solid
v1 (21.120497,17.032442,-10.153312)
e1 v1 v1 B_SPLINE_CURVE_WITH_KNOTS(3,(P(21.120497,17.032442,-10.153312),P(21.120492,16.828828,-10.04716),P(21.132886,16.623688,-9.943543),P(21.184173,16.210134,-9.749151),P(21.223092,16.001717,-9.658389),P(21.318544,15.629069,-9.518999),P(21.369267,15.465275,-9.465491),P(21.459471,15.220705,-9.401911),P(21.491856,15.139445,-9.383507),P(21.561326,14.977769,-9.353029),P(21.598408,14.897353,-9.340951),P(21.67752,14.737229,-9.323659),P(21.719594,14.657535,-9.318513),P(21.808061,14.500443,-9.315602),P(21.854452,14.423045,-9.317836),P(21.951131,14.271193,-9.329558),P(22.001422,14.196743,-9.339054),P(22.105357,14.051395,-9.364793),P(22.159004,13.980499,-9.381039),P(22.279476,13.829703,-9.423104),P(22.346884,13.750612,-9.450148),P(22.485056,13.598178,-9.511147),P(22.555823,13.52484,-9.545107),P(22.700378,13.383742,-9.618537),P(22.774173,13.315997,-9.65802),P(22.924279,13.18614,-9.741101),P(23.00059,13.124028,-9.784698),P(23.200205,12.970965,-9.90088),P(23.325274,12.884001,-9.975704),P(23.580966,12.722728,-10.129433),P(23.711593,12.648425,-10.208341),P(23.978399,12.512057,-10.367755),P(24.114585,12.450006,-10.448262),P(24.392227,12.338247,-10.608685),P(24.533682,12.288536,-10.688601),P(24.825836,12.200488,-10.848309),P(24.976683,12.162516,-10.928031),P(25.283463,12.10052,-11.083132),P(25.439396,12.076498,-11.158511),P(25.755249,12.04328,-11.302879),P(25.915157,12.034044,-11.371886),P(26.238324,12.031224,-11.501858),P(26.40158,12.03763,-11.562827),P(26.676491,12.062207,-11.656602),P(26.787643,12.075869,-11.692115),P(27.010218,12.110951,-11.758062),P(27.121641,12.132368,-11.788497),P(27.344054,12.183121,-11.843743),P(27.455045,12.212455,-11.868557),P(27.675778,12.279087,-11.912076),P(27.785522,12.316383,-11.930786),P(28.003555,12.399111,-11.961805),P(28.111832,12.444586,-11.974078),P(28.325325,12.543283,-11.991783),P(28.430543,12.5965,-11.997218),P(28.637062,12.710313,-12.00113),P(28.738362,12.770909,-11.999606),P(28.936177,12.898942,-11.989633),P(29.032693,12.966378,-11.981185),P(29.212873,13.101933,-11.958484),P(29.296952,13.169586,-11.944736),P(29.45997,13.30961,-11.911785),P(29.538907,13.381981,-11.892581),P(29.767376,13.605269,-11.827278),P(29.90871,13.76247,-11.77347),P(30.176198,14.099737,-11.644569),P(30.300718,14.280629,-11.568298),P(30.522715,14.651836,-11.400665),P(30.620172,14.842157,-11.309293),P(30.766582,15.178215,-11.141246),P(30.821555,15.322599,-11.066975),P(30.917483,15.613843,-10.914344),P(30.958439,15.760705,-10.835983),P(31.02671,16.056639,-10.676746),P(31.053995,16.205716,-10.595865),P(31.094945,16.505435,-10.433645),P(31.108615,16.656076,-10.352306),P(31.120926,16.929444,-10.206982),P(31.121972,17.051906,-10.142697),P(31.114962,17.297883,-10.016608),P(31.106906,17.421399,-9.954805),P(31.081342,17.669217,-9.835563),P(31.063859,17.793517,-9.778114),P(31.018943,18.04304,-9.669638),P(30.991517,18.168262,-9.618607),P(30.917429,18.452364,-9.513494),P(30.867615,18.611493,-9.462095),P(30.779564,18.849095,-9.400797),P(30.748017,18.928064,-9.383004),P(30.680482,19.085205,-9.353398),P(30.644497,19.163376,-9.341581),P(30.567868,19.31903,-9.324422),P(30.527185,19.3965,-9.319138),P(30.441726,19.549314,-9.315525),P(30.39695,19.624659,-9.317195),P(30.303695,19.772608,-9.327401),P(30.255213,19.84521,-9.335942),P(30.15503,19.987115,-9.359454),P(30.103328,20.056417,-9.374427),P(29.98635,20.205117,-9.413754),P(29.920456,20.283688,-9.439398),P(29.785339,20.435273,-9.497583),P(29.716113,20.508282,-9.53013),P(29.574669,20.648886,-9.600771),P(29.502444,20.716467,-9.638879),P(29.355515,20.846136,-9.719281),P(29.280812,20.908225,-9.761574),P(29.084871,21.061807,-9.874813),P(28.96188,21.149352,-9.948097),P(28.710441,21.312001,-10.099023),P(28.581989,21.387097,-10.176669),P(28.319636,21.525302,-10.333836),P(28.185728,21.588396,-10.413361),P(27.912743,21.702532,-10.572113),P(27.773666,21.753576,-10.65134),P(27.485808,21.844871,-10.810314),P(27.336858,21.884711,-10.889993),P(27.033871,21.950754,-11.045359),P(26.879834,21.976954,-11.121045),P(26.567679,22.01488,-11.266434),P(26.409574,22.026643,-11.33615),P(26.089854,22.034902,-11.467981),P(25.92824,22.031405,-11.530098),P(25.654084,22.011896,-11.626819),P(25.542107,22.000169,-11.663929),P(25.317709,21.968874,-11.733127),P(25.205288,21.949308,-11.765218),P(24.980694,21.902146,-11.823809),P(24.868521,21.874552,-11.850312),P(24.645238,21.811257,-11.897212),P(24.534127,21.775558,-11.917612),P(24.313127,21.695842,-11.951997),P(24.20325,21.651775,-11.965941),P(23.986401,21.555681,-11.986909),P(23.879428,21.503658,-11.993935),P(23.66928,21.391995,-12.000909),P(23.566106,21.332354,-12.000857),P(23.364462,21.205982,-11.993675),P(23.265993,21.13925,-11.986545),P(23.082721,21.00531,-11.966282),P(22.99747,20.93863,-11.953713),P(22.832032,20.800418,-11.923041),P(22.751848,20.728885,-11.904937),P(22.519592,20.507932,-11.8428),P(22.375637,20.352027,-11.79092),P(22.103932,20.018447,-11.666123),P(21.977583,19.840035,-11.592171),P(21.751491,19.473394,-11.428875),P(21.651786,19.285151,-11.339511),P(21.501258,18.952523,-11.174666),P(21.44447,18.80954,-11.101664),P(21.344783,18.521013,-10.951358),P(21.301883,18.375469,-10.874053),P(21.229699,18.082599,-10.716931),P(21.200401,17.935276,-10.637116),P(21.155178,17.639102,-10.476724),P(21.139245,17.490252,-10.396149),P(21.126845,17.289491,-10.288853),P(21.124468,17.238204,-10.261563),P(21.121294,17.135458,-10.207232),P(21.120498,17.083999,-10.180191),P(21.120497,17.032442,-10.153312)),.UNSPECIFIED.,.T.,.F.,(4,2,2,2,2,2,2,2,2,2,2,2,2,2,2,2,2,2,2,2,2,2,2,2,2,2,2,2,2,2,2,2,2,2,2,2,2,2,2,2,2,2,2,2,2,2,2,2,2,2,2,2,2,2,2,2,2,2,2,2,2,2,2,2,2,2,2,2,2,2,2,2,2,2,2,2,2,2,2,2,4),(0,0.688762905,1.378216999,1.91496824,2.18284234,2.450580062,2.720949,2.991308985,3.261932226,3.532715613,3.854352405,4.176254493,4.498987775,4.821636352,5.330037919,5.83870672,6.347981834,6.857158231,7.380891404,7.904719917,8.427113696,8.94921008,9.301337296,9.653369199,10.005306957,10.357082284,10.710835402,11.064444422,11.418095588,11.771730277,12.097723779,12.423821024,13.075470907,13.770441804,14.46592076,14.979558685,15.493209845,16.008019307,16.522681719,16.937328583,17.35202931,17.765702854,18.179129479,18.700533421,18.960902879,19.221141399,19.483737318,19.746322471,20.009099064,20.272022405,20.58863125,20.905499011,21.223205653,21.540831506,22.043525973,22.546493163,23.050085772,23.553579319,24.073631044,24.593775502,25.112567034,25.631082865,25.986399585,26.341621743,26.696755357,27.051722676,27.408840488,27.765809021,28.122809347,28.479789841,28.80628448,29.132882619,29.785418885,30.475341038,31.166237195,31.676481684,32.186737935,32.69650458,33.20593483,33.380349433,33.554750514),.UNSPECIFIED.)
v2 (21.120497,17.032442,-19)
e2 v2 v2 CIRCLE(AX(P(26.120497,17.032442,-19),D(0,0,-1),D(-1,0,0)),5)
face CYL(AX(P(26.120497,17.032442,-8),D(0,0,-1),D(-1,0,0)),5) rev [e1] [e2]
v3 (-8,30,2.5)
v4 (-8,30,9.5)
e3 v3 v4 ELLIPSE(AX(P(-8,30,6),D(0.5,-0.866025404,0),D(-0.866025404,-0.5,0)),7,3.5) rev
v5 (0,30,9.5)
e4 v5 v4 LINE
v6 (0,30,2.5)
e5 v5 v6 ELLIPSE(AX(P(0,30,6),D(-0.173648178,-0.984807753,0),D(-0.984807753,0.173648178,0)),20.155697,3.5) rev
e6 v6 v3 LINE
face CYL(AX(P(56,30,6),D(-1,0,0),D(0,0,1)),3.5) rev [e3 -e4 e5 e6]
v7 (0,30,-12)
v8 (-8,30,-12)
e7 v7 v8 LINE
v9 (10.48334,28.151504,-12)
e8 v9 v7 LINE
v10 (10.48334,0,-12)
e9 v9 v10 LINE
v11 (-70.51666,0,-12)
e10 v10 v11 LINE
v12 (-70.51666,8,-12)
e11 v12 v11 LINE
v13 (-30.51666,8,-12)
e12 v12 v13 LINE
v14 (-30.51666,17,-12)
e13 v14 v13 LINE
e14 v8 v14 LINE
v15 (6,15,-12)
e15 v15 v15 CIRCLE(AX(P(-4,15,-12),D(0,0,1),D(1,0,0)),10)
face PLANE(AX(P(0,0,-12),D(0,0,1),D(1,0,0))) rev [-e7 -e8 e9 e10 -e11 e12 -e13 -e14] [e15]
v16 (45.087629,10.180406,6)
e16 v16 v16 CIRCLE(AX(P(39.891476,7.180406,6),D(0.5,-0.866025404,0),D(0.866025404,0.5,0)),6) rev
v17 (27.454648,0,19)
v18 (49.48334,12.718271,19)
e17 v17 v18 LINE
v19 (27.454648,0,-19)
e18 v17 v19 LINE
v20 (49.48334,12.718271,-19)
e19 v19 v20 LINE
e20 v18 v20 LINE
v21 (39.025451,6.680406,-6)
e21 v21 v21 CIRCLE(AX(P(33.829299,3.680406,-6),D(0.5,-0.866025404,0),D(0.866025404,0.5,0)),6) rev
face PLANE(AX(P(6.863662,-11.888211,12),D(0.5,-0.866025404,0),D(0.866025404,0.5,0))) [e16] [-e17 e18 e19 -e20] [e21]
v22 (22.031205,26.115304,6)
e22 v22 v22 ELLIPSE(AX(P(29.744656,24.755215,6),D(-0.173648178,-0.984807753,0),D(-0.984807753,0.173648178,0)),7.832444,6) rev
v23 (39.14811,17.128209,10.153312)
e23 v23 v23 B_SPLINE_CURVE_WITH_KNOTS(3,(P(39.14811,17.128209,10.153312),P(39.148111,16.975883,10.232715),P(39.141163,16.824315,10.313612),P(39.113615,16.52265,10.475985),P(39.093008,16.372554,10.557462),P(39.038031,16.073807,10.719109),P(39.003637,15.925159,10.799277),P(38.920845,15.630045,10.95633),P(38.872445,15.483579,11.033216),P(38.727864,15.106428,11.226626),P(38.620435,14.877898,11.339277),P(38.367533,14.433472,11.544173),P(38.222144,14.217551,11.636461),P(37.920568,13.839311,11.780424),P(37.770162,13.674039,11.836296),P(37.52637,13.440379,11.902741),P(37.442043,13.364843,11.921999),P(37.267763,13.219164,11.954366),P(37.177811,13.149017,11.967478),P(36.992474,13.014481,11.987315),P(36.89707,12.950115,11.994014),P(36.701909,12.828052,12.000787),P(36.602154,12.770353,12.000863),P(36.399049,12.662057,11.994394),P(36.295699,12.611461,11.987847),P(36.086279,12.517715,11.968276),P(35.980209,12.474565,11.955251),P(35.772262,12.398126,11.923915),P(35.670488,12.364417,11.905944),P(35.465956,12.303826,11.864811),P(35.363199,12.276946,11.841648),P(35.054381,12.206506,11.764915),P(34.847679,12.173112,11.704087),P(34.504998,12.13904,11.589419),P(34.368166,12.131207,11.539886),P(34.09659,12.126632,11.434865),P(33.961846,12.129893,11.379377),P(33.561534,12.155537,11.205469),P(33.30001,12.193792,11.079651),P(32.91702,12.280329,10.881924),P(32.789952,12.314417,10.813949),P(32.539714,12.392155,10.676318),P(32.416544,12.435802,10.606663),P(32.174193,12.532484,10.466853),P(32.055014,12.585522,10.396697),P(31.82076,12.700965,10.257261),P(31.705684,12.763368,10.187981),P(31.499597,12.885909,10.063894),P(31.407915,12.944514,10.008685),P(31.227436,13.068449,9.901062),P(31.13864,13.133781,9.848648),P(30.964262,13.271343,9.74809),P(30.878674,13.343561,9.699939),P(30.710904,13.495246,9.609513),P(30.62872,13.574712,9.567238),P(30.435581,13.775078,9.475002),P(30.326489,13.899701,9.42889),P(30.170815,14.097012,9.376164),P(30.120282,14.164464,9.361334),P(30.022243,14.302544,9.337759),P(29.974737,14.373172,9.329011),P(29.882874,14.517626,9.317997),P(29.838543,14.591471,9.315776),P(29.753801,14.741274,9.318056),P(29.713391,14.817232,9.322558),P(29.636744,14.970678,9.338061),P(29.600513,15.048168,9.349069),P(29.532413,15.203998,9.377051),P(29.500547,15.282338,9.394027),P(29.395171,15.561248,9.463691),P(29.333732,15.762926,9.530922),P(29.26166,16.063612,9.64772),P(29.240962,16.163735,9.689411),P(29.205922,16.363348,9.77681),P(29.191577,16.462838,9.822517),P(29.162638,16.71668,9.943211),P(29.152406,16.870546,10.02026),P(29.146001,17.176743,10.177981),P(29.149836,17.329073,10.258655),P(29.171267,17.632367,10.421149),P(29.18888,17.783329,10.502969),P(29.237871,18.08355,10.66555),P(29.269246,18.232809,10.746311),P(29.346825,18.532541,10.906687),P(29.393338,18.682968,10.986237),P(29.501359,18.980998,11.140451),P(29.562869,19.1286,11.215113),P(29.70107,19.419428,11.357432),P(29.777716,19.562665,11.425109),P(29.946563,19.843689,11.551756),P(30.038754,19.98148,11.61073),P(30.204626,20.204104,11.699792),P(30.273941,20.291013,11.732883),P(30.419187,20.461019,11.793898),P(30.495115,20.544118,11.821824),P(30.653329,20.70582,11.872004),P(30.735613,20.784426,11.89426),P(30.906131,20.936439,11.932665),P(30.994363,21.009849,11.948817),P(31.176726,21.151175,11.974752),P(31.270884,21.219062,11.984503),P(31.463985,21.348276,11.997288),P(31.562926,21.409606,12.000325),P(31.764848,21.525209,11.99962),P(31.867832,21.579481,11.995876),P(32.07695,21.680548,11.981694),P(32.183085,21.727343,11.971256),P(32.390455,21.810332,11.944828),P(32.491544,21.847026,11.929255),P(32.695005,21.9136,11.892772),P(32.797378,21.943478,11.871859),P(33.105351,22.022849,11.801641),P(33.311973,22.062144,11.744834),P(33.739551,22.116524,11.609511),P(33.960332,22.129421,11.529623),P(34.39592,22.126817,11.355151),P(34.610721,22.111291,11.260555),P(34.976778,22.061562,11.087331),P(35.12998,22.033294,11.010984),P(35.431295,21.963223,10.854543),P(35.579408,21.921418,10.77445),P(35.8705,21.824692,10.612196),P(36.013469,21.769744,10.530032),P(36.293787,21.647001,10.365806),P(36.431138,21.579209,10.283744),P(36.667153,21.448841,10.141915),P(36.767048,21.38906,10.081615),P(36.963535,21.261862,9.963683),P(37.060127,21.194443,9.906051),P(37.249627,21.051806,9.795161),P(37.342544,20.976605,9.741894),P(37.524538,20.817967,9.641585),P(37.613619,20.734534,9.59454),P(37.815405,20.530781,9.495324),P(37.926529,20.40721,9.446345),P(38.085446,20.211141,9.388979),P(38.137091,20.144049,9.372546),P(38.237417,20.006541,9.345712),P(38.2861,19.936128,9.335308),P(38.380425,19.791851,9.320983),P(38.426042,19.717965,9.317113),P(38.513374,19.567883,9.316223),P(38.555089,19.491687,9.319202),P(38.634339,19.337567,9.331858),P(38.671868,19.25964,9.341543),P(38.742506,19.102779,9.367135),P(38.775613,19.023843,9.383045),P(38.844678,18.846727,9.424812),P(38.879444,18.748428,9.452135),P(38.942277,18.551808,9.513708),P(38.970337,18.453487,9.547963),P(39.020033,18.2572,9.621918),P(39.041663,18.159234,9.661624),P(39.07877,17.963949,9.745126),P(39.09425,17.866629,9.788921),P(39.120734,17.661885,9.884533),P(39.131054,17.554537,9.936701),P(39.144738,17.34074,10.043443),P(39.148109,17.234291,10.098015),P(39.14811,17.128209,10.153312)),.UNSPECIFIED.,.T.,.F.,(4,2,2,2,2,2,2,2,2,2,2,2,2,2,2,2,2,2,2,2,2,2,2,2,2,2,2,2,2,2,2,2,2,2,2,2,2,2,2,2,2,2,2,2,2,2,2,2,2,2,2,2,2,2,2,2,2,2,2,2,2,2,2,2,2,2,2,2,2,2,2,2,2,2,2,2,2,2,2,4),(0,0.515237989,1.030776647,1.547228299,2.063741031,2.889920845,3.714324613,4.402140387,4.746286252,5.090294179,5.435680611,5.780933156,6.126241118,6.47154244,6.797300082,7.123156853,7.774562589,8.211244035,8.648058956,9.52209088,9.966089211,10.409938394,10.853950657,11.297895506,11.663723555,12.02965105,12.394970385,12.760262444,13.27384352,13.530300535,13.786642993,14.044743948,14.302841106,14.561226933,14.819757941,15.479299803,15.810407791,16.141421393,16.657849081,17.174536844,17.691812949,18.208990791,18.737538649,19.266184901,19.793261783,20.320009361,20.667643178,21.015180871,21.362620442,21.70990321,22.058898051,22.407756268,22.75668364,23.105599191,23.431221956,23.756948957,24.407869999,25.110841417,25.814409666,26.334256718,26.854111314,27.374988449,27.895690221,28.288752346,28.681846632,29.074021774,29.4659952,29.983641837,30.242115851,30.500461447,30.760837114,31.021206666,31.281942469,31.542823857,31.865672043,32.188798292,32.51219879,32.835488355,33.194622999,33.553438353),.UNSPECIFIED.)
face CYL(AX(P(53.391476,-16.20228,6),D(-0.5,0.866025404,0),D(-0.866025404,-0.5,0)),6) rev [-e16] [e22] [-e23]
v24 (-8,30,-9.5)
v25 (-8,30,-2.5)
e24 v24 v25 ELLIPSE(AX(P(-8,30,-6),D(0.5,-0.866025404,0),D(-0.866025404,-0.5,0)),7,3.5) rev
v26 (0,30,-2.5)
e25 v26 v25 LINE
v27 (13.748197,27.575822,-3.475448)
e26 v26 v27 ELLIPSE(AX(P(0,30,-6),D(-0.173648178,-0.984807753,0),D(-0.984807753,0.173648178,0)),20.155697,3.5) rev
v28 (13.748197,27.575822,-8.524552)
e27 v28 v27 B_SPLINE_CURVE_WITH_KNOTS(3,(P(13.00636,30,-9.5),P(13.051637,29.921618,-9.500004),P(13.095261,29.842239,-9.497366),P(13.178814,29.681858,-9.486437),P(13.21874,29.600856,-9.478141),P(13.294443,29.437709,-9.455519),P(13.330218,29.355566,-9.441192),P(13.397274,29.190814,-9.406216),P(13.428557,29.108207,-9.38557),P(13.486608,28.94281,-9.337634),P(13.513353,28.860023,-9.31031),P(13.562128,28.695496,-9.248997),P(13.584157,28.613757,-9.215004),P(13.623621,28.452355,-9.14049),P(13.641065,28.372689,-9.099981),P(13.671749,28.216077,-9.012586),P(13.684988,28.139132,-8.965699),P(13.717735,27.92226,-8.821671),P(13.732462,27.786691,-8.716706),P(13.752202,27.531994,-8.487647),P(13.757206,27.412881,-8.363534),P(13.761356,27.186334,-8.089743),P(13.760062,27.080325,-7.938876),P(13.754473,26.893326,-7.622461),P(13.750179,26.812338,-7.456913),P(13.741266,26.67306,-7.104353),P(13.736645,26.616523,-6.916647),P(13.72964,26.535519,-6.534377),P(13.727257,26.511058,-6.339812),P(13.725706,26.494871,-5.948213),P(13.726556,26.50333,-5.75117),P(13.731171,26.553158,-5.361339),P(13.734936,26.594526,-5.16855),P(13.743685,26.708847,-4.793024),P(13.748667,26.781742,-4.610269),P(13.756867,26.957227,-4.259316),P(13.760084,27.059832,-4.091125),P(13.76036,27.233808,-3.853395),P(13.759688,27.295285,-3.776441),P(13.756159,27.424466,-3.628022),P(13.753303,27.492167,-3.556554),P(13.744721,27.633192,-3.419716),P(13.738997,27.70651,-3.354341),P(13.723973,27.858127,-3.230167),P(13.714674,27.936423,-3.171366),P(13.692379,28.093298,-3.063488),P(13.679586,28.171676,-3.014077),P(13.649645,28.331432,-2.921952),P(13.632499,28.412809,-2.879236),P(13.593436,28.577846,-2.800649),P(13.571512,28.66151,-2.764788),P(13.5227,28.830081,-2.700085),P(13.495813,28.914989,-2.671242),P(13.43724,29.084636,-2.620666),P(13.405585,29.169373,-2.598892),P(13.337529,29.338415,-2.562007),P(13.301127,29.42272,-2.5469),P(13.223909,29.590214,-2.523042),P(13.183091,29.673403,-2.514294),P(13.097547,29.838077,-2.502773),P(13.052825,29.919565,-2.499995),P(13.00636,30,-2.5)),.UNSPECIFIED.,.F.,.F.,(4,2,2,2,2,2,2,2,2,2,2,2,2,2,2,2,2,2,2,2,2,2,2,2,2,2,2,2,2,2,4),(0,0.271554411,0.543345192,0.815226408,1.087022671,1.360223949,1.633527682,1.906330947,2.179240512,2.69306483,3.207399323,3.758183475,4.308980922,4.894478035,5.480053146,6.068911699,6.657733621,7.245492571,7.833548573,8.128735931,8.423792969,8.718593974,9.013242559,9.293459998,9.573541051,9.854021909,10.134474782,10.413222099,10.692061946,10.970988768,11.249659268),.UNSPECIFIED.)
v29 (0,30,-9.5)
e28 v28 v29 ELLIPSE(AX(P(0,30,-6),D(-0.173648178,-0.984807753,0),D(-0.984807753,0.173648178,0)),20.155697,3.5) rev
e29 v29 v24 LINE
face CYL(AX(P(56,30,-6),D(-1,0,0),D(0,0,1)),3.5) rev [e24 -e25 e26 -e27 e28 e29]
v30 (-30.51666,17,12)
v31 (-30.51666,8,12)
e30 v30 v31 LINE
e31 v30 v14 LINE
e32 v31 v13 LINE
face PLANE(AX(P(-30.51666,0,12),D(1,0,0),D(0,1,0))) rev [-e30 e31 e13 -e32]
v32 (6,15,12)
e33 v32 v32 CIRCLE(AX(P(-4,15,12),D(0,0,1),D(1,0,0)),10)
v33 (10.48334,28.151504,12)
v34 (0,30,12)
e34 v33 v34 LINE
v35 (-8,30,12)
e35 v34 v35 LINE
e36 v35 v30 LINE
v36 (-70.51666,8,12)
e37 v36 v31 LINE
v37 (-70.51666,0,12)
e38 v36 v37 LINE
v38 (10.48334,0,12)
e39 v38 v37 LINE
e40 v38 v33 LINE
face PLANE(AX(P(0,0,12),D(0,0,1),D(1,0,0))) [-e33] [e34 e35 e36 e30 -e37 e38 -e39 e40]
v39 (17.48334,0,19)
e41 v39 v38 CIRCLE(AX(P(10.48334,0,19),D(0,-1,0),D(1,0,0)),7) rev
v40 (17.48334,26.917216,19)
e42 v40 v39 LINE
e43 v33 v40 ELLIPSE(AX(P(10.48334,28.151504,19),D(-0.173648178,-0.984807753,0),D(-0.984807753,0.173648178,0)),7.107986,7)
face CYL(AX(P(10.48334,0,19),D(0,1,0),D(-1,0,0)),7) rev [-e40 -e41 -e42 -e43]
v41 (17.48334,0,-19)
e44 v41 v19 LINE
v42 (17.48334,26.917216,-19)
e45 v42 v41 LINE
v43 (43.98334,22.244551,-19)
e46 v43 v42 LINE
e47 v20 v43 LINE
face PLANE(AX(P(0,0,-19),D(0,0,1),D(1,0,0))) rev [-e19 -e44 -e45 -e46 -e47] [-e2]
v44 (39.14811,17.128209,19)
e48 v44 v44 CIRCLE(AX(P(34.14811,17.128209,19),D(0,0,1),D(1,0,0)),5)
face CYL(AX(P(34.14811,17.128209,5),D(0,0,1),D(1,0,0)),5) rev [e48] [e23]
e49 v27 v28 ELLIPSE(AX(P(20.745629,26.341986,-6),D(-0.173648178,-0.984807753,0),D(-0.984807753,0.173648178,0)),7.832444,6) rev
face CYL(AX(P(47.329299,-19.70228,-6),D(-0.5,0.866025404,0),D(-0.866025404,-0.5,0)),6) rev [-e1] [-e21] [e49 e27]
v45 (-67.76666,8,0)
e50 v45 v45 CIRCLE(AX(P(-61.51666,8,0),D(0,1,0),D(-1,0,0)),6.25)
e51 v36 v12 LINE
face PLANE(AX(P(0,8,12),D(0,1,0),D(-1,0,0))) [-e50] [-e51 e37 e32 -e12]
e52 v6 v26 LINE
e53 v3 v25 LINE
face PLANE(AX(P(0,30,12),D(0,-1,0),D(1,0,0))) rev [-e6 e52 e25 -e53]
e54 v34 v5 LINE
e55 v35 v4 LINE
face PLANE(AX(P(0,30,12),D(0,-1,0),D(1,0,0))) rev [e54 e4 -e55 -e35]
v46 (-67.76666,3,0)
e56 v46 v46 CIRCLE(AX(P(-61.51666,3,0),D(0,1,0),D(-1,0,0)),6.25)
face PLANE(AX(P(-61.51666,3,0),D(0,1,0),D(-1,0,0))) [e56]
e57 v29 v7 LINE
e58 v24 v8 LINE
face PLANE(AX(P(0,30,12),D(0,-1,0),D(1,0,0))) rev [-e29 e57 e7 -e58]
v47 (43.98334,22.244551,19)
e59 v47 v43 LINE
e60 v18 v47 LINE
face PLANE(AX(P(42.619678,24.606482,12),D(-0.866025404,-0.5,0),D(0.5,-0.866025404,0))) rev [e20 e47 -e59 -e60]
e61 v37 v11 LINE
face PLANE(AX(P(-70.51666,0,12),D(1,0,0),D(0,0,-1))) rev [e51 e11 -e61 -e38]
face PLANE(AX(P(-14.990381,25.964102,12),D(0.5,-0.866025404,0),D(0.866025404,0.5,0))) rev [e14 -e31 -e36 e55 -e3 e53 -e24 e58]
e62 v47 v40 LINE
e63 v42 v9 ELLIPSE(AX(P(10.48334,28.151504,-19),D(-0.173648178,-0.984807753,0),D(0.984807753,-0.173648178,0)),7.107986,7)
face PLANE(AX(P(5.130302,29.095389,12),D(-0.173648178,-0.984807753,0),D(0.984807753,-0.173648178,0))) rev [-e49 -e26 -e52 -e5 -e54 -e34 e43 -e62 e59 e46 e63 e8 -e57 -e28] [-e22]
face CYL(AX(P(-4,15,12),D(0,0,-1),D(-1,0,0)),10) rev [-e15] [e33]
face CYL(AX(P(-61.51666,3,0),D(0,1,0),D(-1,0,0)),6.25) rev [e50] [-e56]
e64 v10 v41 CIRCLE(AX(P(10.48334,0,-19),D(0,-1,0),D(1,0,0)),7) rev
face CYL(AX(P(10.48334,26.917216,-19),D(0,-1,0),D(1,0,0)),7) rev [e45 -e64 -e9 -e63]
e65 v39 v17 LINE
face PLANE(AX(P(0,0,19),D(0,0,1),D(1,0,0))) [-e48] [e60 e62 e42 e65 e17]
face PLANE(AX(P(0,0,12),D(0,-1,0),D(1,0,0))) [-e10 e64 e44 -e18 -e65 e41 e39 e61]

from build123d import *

# Parameters (mm, degrees)
SKETCH1_R               = 10
SKETCH1_W               = 40
SKETCH1_H               = 8
BOSS_EXTRUDE1_DEPTH     = 12
BOSS_EXTRUDE2_DEPTH     = 19
CUT_EXTRUDE1_DEPTH      = 38
CUT_EXTRUDE1_DEPTH_BACK = 38
SKETCH4_R               = 6
FILLET1_R               = 7
SKETCH6_R               = 6.25
CUT_EXTRUDE2_DEPTH      = 5
CUT_EXTRUDE3_DEPTH      = 56
CUT_EXTRUDE3_DEPTH_BACK = 21
SKETCH9_R               = 5
CUT_EXTRUDE4_DEPTH      = 14
SKETCH10_R              = 5
CUT_EXTRUDE5_DEPTH      = 11


with BuildPart() as part:
    # Sketch1 → Boss-Extrude1 (new, symmetric)
    # profile 1 of 2: a face of its own
    with BuildSketch(Plane.XY):
        Polygon((49.483339502, 12.718271103), (43.983339502, 22.244550544), (0, 30), (-8, 30), (-30.516660498, 17), (-30.516660498, 8), (-30.516660498, 0), (0, 0), (27.454647768, 0), align=None)
        with Locations((-4, 15)):
            Circle(SKETCH1_R, mode=Mode.SUBTRACT)
    # profile 2 of 2: a face of its own
    with BuildSketch(Plane.XY):
        with Locations((-50.516660498, 4)):
            Rectangle(SKETCH1_W, SKETCH1_H)
    extrude(amount=BOSS_EXTRUDE1_DEPTH, both=True)

    # Sketch2 → Boss-Extrude2 (add, symmetric)
    with BuildSketch(Plane.XY):
        Polygon((17.483339502, 26.917215533), (17.483339502, 0), (27.454647768, 0), (49.483339502, 12.718271103), (43.983339502, 22.244550544), align=None)
    extrude(amount=BOSS_EXTRUDE2_DEPTH, both=True)

    # Sketch4 → Cut-Extrude1 (cut, two sides: drawn at the far end of the back side and taken through both)
    with BuildSketch(Plane(origin=(1.363661942, -2.361931768, 0), x_dir=(-0.8660254037844379, -0.5000000000000014, 0), z_dir=(0.5000000000000014, -0.8660254037844379, 0)).offset(-CUT_EXTRUDE1_DEPTH_BACK)):
        with Locations((-31.137235053, 6)):
            Circle(SKETCH4_R)
        with Locations((-38.137235053, -6)):
            Circle(SKETCH4_R)
    extrude(amount=CUT_EXTRUDE1_DEPTH + CUT_EXTRUDE1_DEPTH_BACK, mode=Mode.SUBTRACT)

    # Fillet1
    fillet1_edges = [part.edges().sort_by_distance(p)[0] for p in [
        (17.483339502, 13.458607766, -12),
        (17.483339502, 13.458607766, 12),
    ]]
    fillet(fillet1_edges, radius=FILLET1_R - 0.0001)  # a hair under: the kernel refuses the full size

    # Sketch6 → Cut-Extrude2 (cut)
    with BuildSketch(Plane(origin=(0, 8, 0), x_dir=(1, 0, 0), z_dir=(0, 1, 0))):
        with Locations(Location((-61.516660498, 0, 0), (0, 0, 180))):
            Circle(SKETCH6_R)
    extrude(amount=-CUT_EXTRUDE2_DEPTH, mode=Mode.SUBTRACT)

    # Sketch8 → Cut-Extrude3 (cut, two sides: drawn at the far end of the back side and taken through both)
    with BuildSketch(Plane(origin=(0, 0, 0), x_dir=(0, 0, -1), z_dir=(1, 0, 0)).offset(-CUT_EXTRUDE3_DEPTH_BACK)):
        with BuildLine():
            Line((-9.5, 30), (-2.5, 30))
            ThreePointArc((-2.5, 30), (-6, 26.5), (-9.5, 30))
        make_face()
        with BuildLine():
            Line((2.5, 30), (9.5, 30))
            ThreePointArc((9.5, 30), (6, 26.5), (2.5, 30))
        make_face()
    extrude(amount=CUT_EXTRUDE3_DEPTH + CUT_EXTRUDE3_DEPTH_BACK, mode=Mode.SUBTRACT)

    # Sketch9 → Cut-Extrude4 (cut)
    with BuildSketch(Plane.XY.offset(19)):
        with Locations((34.148109615, 17.12820927)):
            Circle(SKETCH9_R)
    extrude(amount=-CUT_EXTRUDE4_DEPTH, mode=Mode.SUBTRACT)

    # Sketch10 → Cut-Extrude5 (cut)
    with BuildSketch(Plane(origin=(0, 0, -19), x_dir=(-1, 0, 0), z_dir=(0, 0, -1))):
        with Locations((-26.120496882, 17.032442386)):
            Circle(SKETCH10_R)
    extrude(amount=-CUT_EXTRUDE5_DEPTH, mode=Mode.SUBTRACT)


solid = part.part
